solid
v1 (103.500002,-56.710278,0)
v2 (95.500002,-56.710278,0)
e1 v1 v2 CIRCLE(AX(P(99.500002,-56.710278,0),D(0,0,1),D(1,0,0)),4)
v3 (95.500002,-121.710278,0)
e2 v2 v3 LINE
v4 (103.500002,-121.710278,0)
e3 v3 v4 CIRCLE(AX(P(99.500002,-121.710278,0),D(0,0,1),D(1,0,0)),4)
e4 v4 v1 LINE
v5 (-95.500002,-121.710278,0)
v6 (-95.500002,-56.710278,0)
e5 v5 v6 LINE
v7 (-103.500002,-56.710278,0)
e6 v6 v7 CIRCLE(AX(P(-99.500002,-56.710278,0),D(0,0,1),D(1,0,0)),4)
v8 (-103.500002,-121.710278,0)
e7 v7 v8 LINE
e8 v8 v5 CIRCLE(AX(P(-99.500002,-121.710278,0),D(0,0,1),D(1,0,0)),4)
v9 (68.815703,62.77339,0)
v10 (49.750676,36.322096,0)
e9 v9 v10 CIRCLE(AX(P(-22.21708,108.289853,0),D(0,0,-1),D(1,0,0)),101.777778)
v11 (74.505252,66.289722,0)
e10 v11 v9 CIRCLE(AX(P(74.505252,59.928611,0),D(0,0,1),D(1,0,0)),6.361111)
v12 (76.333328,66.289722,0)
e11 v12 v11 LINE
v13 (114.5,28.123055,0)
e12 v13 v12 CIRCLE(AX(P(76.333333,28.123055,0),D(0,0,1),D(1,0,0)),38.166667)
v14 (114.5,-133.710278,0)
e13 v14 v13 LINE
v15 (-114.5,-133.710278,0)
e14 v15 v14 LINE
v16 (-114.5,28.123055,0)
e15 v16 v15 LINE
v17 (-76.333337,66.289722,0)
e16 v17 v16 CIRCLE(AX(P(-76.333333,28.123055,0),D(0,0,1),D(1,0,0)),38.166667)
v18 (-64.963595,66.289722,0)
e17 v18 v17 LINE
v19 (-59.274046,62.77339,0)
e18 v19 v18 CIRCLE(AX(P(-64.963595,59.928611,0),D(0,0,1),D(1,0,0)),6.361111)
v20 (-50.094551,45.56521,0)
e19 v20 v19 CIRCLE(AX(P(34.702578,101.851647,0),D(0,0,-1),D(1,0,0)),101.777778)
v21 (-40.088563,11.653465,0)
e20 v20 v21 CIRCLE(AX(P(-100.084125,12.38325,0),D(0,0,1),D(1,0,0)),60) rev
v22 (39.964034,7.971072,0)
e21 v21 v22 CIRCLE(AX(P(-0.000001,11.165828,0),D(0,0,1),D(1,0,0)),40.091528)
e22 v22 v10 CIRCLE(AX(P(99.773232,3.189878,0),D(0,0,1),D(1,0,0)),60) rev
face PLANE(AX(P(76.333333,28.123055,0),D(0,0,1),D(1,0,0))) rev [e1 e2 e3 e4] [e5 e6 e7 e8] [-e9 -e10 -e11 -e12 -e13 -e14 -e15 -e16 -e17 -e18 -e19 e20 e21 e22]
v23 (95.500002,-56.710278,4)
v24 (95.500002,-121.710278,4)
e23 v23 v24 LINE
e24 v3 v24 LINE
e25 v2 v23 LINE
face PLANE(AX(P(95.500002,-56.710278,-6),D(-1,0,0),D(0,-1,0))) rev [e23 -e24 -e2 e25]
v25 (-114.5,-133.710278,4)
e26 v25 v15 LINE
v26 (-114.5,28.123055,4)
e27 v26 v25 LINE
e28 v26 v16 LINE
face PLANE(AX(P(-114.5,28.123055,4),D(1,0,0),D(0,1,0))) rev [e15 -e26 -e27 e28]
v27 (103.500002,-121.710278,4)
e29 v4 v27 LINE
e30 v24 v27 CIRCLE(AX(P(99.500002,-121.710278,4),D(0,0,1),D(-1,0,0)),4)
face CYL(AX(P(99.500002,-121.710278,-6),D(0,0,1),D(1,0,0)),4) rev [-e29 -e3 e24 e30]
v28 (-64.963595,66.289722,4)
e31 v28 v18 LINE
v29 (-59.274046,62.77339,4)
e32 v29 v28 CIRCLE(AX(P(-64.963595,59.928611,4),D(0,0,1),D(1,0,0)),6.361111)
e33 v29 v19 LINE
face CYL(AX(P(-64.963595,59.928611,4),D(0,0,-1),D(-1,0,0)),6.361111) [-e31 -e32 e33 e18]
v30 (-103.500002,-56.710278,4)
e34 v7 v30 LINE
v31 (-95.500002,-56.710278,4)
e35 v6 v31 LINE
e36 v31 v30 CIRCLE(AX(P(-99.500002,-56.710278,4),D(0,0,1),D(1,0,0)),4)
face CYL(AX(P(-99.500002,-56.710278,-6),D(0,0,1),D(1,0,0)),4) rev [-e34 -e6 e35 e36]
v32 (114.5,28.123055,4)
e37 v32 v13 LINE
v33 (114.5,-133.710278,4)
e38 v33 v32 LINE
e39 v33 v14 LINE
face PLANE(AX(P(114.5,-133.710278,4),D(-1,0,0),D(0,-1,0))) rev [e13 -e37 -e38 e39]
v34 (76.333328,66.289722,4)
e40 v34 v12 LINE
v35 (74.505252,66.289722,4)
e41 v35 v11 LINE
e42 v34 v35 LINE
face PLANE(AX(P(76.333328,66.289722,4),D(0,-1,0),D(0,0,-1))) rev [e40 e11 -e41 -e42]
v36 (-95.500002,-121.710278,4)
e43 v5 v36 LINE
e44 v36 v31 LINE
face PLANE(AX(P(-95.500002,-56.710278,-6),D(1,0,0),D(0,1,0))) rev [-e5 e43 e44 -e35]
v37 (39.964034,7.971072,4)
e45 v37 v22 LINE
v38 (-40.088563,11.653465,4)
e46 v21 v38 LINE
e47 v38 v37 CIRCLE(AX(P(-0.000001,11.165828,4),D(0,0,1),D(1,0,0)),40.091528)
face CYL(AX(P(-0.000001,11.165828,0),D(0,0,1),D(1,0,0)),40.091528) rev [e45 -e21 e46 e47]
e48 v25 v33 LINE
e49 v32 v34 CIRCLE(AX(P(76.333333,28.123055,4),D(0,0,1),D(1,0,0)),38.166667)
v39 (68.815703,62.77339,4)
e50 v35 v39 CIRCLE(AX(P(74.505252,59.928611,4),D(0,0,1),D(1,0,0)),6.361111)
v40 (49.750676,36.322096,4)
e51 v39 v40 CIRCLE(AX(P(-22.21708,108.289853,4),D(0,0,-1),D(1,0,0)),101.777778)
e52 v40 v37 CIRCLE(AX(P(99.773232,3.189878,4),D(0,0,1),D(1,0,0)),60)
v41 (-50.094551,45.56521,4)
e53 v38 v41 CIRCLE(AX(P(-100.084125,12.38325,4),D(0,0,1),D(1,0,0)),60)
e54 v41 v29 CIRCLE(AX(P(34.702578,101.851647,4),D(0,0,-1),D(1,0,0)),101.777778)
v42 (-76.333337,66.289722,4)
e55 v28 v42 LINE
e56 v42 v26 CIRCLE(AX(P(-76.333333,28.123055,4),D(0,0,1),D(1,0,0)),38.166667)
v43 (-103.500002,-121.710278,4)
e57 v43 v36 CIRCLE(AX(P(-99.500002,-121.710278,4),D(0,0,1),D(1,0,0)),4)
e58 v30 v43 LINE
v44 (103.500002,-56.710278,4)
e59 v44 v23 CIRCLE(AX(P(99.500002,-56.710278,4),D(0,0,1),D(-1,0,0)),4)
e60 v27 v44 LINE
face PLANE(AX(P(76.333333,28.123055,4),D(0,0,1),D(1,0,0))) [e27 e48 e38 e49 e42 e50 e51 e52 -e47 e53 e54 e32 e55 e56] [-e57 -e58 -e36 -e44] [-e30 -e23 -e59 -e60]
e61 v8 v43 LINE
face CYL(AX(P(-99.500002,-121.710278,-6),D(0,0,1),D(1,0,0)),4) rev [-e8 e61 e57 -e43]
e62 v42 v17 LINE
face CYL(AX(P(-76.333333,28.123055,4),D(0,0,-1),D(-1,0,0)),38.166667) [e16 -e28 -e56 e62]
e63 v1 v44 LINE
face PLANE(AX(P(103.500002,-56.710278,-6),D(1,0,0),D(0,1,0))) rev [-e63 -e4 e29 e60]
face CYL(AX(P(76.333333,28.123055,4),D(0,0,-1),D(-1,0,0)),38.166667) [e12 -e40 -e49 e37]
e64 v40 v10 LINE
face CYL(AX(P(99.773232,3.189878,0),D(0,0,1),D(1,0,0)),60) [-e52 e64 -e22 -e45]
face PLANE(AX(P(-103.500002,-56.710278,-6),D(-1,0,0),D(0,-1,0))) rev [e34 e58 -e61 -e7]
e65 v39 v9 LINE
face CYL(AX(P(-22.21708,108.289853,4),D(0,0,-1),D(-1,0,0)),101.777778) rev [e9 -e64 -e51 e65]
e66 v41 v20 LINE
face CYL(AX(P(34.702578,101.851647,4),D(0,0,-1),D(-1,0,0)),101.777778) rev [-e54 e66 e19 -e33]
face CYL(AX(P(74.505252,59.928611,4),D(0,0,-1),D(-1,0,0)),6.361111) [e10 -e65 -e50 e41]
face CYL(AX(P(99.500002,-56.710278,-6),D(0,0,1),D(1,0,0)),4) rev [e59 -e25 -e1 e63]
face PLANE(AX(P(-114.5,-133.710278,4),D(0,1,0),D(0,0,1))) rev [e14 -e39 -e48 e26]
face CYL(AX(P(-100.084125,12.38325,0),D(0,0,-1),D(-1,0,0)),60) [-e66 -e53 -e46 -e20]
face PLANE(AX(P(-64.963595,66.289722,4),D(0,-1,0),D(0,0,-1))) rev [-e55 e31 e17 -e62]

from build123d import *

# Parameters (mm, degrees)
BOSS_EXTRUDE1_DEPTH = 4
CUT_EXTRUDE1_DEPTH  = 10
SKETCH6_R           = 40.091527734
CUT_EXTRUDE2_DEPTH  = 4
FILLET1_START       = -1
FILLET1_DEPTH       = 6


with BuildPart() as part:
    # Sketch1 → Boss-Extrude1 (new body)
    with BuildSketch(Plane.XY):
        with BuildLine():
            Line((76.333328469, 66.289722012), (74.505251863, 66.289722012))
            ThreePointArc((74.505251863, 66.289722012), (71.161019545, 65.339696261), (68.815702909, 62.773389851))
            ThreePointArc((68.815702909, 62.773389851), (60.349327785, 48.779313667), (49.750676494, 36.322096209))
            ThreePointArc((49.750676494, 36.322096209), (34.635353478, 21.965885228), (23.967617679, 4.055742947))
            ThreePointArc((23.967617679, 4.055742947), (14.404733147, -9.267078846), (-1.356711824, -13.797331986))
            ThreePointArc((-1.356711824, -13.797331986), (-15.492367955, -8.455246222), (-23.967617153, 4.055741173))
            ThreePointArc((-23.967617153, 4.055741173), (-31.555286979, 21.388261286), (-43.172925895, 36.322097125))
            ThreePointArc((-43.172925895, 36.322097125), (-52.235366406, 48.931803578), (-59.274045863, 62.773390061))
            ThreePointArc((-59.274045863, 62.773390061), (-61.619362494, 65.339696323), (-64.963594711, 66.289722012))
            Line((-64.963594711, 66.289722012), (-76.333336807, 66.289722012))
            ThreePointArc((-76.333336807, 66.289722012), (-103.321243377, 55.110962932), (-114.5, 28.123055345))
            Line((-114.5, 28.123055345), (-114.5, -133.710277988))
            Line((-114.5, -133.710277988), (114.5, -133.710277988))
            Line((114.5, -133.710277988), (114.5, 28.123055345))
            ThreePointArc((114.5, 28.123055345), (103.321240429, 55.11096588), (76.333328469, 66.289722012))
        make_face()
    extrude(amount=BOSS_EXTRUDE1_DEPTH)

    # Sketch2 → Cut-Extrude1 (cut)
    with BuildSketch(Plane.XY.offset(4)):
        with BuildLine():
            Line((-95.500001569, -56.710277988), (-95.500001569, -121.710277988))
            ThreePointArc((-95.500001569, -121.710277988), (-99.500001569, -125.710277988), (-103.500001569, -121.710277988))
            Line((-103.500001569, -121.710277988), (-103.500001569, -56.710277988))
            ThreePointArc((-103.500001569, -56.710277988), (-99.500001569, -52.710277988), (-95.500001569, -56.710277988))
        make_face()
        with BuildLine():
            Line((95.500001569, -56.710277988), (95.500001569, -121.710277988))
            ThreePointArc((95.500001569, -121.710277988), (99.500001569, -125.710277988), (103.500001569, -121.710277988))
            Line((103.500001569, -121.710277988), (103.500001569, -56.710277988))
            ThreePointArc((103.500001569, -56.710277988), (99.500001569, -52.710277988), (95.500001569, -56.710277988))
        make_face()
    extrude(amount=-CUT_EXTRUDE1_DEPTH, mode=Mode.SUBTRACT)

    # Sketch6 → Cut-Extrude2 (cut)
    with BuildSketch(Plane.XY.offset(4)):
        with Locations((-1.216e-06, 11.16582753)):
            Circle(SKETCH6_R)
    extrude(amount=-CUT_EXTRUDE2_DEPTH, mode=Mode.SUBTRACT)

    # Fillet1: read off the stored shape, not the designer's step
    # Fillet1 outline → Fillet1 (cut)
    with BuildSketch(Plane.XY.offset(FILLET1_START)):
        with BuildLine():
            ThreePointArc((-43.172925895, 36.322097125), (-46.764931779, 40.845410754), (-50.094550883, 45.56521044))
            ThreePointArc((-50.094550883, 45.56521044), (-42.536890866, 29.36311637), (-40.088563254, 11.653464507))
            ThreePointArc((-40.088563254, 11.653464507), (-39.059263062, 20.20489054), (-36.227182581, 28.339118606))
            ThreePointArc((-36.227182581, 28.339118606), (-39.561558424, 32.4511088), (-43.172925895, 36.322097125))
        make_face()
        with BuildLine():
            ThreePointArc((37.500310301, 25.345292688), (39.69442098, 16.794632252), (39.964034241, 7.971071505))
            ThreePointArc((39.964034241, 7.971071505), (43.057284902, 22.767959834), (49.750676494, 36.322096209))
            ThreePointArc((49.750676494, 36.322096209), (43.328961969, 31.16463037), (37.500310301, 25.345292688))
        make_face()
    extrude(amount=FILLET1_DEPTH, mode=Mode.SUBTRACT)


solid = part.part
